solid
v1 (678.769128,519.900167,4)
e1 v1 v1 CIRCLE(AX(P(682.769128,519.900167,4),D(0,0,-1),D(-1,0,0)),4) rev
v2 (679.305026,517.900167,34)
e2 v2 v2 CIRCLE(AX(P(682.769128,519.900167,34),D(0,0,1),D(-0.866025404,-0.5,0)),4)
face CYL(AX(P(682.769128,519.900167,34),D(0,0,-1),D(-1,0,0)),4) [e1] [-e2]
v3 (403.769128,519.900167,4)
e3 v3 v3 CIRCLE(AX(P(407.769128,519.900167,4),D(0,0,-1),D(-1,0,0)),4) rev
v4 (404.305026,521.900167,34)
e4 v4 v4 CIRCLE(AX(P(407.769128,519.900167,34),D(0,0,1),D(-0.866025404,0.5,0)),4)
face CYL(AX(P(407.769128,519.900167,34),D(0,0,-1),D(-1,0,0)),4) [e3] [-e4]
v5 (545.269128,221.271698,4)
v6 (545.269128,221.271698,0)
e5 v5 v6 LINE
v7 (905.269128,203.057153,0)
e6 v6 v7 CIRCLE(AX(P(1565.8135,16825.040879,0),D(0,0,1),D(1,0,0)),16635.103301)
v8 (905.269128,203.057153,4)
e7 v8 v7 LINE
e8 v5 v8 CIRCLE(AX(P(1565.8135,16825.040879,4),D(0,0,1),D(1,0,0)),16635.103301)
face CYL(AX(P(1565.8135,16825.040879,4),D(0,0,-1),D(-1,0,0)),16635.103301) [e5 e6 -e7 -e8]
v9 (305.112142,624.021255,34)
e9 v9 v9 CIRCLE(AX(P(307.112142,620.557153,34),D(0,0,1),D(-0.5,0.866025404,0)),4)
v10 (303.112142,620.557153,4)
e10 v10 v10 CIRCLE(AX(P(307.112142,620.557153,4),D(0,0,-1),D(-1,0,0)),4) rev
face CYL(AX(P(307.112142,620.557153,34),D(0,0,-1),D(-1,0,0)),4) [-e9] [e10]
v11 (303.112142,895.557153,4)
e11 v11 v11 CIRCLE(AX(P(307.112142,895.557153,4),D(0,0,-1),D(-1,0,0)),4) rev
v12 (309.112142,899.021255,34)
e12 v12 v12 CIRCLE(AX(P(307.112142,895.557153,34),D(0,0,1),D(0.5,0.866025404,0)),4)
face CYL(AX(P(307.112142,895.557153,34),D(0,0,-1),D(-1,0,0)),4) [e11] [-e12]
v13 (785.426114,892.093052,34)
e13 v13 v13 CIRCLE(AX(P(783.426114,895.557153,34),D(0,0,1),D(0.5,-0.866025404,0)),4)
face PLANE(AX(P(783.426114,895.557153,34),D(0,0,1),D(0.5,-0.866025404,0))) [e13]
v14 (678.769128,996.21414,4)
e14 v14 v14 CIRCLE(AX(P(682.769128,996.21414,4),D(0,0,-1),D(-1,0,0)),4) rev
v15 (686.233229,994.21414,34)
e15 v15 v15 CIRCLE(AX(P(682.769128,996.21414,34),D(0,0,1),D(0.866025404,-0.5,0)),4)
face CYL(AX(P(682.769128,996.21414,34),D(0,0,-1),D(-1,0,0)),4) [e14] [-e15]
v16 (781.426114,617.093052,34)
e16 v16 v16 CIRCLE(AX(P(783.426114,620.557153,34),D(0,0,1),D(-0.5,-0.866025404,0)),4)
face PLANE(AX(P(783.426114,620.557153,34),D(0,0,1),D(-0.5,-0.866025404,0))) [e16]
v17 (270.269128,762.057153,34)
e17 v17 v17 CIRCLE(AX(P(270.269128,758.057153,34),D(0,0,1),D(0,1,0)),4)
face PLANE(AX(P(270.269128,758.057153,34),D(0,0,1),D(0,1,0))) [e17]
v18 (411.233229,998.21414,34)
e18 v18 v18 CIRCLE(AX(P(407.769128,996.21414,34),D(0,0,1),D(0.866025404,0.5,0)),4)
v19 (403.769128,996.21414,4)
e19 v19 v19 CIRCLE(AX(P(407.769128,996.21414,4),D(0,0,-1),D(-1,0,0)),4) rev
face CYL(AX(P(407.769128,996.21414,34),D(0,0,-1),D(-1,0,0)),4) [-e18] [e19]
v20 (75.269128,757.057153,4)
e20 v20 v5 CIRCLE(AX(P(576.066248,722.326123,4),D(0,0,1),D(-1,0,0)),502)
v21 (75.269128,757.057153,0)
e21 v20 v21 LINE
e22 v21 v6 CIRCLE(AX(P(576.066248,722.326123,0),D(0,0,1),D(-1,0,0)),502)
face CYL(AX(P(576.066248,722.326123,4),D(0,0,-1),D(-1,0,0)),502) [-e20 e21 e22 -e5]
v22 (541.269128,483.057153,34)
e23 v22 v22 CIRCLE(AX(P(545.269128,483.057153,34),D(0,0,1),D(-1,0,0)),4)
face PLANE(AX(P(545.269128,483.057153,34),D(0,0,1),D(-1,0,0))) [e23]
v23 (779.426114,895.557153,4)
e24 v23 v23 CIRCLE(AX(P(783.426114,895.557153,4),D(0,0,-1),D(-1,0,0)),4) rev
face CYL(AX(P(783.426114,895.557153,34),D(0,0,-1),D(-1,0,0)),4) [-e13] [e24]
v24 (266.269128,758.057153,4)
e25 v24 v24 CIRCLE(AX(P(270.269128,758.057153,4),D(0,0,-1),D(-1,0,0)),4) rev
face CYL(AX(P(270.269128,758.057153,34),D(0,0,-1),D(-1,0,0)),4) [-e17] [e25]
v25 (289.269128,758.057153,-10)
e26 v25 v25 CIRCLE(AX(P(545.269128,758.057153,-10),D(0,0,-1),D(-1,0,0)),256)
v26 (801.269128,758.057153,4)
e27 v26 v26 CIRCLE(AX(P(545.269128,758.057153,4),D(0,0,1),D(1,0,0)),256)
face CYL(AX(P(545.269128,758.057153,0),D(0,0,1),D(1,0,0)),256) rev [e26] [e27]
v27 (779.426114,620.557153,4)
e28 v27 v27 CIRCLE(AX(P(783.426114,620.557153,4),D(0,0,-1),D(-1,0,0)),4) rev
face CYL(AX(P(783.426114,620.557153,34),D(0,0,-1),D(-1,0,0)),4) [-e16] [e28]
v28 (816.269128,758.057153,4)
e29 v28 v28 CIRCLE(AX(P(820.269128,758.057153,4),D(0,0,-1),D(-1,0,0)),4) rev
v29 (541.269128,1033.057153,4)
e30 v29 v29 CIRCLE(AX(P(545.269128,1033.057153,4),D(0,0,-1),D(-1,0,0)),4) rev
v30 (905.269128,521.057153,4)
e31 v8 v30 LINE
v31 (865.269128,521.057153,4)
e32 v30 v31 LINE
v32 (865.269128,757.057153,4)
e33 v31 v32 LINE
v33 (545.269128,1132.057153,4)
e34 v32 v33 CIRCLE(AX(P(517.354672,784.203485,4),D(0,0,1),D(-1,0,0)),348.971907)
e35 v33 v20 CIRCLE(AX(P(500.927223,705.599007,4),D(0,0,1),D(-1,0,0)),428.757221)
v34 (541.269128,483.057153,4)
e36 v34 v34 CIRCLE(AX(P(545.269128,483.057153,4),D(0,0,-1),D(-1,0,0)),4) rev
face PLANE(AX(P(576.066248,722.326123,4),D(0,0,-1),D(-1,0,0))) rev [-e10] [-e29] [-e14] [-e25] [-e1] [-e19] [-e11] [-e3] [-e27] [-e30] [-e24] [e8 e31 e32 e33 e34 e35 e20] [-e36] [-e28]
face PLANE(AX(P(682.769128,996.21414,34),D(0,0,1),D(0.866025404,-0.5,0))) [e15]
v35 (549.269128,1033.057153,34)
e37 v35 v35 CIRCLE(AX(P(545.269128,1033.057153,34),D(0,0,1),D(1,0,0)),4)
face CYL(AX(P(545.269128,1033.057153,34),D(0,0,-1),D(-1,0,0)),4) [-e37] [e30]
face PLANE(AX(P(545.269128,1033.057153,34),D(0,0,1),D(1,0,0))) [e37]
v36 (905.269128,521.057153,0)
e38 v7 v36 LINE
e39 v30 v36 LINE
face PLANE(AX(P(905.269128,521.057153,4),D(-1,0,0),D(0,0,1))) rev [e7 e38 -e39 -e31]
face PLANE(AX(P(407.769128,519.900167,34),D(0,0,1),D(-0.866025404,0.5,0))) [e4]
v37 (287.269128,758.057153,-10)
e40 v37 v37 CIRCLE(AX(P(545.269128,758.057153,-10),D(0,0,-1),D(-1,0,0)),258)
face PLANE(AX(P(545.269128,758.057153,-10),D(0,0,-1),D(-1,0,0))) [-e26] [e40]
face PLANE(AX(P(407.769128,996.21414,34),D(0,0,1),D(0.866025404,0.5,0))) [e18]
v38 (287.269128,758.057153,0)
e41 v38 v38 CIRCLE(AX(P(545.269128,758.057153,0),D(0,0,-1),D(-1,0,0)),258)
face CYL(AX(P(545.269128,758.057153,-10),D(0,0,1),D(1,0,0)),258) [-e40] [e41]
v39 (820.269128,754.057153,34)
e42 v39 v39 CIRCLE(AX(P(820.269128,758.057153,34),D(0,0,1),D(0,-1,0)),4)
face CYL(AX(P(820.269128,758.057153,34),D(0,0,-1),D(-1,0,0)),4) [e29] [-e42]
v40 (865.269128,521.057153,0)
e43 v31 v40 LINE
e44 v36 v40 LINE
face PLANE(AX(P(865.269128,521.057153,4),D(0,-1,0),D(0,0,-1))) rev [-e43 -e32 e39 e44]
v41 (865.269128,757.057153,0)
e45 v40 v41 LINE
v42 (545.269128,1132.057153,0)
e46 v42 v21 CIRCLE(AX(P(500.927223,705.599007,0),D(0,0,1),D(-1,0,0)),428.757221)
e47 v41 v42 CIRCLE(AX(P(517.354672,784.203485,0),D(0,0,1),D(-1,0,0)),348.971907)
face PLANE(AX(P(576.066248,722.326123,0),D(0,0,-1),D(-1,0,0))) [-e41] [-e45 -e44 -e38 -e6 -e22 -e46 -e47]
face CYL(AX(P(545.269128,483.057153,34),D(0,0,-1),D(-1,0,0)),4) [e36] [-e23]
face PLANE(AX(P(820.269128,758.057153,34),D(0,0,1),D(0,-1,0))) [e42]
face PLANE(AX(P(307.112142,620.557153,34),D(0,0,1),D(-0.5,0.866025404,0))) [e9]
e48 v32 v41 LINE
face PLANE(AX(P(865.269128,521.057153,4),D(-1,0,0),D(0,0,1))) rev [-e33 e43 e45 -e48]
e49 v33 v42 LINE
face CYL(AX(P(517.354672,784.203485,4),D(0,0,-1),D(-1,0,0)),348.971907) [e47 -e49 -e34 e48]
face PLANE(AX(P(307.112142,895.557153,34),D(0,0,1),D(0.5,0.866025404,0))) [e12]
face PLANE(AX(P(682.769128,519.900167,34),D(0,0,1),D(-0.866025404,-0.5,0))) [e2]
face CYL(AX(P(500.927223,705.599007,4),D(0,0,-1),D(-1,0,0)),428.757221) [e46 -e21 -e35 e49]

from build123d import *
from build123d.topology import SkipClean

# Parameters (mm, degrees)
BOSS_EXTRUDE1_DEPTH = 4
SKETCH2_R           = 256
CUT_EXTRUDE1_DEPTH  = 4
SKETCH3_R           = 258
SKETCH3_R_2         = 256
EXTRUDE_THIN1_DEPTH = 10
SKETCH5_R           = 4
BOSS_EXTRUDE2_DEPTH = 30
CIRPATTERN1_COUNT   = 12


with BuildPart() as part:
    # Sketch1 → Boss-Extrude1 (new body)
    with BuildSketch(Plane.XY):
        with BuildLine():
            Line((865.269127642, 521.057153497), (865.269127642, 757.057153497))
            ThreePointArc((865.269127642, 757.057153497), (782.812941082, 1010.7278743), (545.269127642, 1132.057153497))
            ThreePointArc((545.269127642, 1132.057153497), (233.519744905, 1040.749713195), (75.269127642, 757.057153497))
            ThreePointArc((75.269127642, 757.057153497), (198.687627947, 391.283260157), (545.269127642, 221.271697797))
            ThreePointArc((545.269127642, 221.271697797), (725.219790584, 211.189307063), (905.269127642, 203.057153497))
            Line((905.269127642, 203.057153497), (905.269127642, 521.057153497))
            Line((905.269127642, 521.057153497), (865.269127642, 521.057153497))
        make_face()
    extrude(amount=BOSS_EXTRUDE1_DEPTH)

    # Sketch2 → Cut-Extrude1 (cut)
    with BuildSketch(Plane.XY.offset(4)):
        with Locations((545.269127642, 758.057153497)):
            Circle(SKETCH2_R)
    extrude(amount=-CUT_EXTRUDE1_DEPTH, mode=Mode.SUBTRACT)

    # Sketch3 → Extrude-Thin1 (add)
    with SkipClean():  # the faces are left unmerged after this step: merging them gives an invalid solid
        with BuildSketch(Plane(origin=(0, 0, 0), x_dir=(-1, 0, 0), z_dir=(0, 0, -1))):
            with Locations((-545.269127642, 758.057153497)):
                Circle(SKETCH3_R)
            with Locations((-545.269127642, 758.057153497)):
                Circle(SKETCH3_R_2, mode=Mode.SUBTRACT)
        extrude(amount=EXTRUDE_THIN1_DEPTH)
    add(part.part.scale(1), mode=Mode.REPLACE)  # the faces are merged on a copy

    # Sketch5 → Boss-Extrude2 (add)
    with BuildSketch(Plane.XY.offset(4)):
        with Locations((545.269127642, 1033.057153497)):
            Circle(SKETCH5_R)
    boss_extrude2 = extrude(amount=BOSS_EXTRUDE2_DEPTH)

    # CirPattern1: Boss-Extrude2 ×12 about axis
    cirpattern1_axis = Axis((545.269127642, 758.057153497, 4), (0, 0, 1))
    for i in range(1, CIRPATTERN1_COUNT):
        add(boss_extrude2.rotate(cirpattern1_axis, i * 360 / CIRPATTERN1_COUNT))


solid = part.part
